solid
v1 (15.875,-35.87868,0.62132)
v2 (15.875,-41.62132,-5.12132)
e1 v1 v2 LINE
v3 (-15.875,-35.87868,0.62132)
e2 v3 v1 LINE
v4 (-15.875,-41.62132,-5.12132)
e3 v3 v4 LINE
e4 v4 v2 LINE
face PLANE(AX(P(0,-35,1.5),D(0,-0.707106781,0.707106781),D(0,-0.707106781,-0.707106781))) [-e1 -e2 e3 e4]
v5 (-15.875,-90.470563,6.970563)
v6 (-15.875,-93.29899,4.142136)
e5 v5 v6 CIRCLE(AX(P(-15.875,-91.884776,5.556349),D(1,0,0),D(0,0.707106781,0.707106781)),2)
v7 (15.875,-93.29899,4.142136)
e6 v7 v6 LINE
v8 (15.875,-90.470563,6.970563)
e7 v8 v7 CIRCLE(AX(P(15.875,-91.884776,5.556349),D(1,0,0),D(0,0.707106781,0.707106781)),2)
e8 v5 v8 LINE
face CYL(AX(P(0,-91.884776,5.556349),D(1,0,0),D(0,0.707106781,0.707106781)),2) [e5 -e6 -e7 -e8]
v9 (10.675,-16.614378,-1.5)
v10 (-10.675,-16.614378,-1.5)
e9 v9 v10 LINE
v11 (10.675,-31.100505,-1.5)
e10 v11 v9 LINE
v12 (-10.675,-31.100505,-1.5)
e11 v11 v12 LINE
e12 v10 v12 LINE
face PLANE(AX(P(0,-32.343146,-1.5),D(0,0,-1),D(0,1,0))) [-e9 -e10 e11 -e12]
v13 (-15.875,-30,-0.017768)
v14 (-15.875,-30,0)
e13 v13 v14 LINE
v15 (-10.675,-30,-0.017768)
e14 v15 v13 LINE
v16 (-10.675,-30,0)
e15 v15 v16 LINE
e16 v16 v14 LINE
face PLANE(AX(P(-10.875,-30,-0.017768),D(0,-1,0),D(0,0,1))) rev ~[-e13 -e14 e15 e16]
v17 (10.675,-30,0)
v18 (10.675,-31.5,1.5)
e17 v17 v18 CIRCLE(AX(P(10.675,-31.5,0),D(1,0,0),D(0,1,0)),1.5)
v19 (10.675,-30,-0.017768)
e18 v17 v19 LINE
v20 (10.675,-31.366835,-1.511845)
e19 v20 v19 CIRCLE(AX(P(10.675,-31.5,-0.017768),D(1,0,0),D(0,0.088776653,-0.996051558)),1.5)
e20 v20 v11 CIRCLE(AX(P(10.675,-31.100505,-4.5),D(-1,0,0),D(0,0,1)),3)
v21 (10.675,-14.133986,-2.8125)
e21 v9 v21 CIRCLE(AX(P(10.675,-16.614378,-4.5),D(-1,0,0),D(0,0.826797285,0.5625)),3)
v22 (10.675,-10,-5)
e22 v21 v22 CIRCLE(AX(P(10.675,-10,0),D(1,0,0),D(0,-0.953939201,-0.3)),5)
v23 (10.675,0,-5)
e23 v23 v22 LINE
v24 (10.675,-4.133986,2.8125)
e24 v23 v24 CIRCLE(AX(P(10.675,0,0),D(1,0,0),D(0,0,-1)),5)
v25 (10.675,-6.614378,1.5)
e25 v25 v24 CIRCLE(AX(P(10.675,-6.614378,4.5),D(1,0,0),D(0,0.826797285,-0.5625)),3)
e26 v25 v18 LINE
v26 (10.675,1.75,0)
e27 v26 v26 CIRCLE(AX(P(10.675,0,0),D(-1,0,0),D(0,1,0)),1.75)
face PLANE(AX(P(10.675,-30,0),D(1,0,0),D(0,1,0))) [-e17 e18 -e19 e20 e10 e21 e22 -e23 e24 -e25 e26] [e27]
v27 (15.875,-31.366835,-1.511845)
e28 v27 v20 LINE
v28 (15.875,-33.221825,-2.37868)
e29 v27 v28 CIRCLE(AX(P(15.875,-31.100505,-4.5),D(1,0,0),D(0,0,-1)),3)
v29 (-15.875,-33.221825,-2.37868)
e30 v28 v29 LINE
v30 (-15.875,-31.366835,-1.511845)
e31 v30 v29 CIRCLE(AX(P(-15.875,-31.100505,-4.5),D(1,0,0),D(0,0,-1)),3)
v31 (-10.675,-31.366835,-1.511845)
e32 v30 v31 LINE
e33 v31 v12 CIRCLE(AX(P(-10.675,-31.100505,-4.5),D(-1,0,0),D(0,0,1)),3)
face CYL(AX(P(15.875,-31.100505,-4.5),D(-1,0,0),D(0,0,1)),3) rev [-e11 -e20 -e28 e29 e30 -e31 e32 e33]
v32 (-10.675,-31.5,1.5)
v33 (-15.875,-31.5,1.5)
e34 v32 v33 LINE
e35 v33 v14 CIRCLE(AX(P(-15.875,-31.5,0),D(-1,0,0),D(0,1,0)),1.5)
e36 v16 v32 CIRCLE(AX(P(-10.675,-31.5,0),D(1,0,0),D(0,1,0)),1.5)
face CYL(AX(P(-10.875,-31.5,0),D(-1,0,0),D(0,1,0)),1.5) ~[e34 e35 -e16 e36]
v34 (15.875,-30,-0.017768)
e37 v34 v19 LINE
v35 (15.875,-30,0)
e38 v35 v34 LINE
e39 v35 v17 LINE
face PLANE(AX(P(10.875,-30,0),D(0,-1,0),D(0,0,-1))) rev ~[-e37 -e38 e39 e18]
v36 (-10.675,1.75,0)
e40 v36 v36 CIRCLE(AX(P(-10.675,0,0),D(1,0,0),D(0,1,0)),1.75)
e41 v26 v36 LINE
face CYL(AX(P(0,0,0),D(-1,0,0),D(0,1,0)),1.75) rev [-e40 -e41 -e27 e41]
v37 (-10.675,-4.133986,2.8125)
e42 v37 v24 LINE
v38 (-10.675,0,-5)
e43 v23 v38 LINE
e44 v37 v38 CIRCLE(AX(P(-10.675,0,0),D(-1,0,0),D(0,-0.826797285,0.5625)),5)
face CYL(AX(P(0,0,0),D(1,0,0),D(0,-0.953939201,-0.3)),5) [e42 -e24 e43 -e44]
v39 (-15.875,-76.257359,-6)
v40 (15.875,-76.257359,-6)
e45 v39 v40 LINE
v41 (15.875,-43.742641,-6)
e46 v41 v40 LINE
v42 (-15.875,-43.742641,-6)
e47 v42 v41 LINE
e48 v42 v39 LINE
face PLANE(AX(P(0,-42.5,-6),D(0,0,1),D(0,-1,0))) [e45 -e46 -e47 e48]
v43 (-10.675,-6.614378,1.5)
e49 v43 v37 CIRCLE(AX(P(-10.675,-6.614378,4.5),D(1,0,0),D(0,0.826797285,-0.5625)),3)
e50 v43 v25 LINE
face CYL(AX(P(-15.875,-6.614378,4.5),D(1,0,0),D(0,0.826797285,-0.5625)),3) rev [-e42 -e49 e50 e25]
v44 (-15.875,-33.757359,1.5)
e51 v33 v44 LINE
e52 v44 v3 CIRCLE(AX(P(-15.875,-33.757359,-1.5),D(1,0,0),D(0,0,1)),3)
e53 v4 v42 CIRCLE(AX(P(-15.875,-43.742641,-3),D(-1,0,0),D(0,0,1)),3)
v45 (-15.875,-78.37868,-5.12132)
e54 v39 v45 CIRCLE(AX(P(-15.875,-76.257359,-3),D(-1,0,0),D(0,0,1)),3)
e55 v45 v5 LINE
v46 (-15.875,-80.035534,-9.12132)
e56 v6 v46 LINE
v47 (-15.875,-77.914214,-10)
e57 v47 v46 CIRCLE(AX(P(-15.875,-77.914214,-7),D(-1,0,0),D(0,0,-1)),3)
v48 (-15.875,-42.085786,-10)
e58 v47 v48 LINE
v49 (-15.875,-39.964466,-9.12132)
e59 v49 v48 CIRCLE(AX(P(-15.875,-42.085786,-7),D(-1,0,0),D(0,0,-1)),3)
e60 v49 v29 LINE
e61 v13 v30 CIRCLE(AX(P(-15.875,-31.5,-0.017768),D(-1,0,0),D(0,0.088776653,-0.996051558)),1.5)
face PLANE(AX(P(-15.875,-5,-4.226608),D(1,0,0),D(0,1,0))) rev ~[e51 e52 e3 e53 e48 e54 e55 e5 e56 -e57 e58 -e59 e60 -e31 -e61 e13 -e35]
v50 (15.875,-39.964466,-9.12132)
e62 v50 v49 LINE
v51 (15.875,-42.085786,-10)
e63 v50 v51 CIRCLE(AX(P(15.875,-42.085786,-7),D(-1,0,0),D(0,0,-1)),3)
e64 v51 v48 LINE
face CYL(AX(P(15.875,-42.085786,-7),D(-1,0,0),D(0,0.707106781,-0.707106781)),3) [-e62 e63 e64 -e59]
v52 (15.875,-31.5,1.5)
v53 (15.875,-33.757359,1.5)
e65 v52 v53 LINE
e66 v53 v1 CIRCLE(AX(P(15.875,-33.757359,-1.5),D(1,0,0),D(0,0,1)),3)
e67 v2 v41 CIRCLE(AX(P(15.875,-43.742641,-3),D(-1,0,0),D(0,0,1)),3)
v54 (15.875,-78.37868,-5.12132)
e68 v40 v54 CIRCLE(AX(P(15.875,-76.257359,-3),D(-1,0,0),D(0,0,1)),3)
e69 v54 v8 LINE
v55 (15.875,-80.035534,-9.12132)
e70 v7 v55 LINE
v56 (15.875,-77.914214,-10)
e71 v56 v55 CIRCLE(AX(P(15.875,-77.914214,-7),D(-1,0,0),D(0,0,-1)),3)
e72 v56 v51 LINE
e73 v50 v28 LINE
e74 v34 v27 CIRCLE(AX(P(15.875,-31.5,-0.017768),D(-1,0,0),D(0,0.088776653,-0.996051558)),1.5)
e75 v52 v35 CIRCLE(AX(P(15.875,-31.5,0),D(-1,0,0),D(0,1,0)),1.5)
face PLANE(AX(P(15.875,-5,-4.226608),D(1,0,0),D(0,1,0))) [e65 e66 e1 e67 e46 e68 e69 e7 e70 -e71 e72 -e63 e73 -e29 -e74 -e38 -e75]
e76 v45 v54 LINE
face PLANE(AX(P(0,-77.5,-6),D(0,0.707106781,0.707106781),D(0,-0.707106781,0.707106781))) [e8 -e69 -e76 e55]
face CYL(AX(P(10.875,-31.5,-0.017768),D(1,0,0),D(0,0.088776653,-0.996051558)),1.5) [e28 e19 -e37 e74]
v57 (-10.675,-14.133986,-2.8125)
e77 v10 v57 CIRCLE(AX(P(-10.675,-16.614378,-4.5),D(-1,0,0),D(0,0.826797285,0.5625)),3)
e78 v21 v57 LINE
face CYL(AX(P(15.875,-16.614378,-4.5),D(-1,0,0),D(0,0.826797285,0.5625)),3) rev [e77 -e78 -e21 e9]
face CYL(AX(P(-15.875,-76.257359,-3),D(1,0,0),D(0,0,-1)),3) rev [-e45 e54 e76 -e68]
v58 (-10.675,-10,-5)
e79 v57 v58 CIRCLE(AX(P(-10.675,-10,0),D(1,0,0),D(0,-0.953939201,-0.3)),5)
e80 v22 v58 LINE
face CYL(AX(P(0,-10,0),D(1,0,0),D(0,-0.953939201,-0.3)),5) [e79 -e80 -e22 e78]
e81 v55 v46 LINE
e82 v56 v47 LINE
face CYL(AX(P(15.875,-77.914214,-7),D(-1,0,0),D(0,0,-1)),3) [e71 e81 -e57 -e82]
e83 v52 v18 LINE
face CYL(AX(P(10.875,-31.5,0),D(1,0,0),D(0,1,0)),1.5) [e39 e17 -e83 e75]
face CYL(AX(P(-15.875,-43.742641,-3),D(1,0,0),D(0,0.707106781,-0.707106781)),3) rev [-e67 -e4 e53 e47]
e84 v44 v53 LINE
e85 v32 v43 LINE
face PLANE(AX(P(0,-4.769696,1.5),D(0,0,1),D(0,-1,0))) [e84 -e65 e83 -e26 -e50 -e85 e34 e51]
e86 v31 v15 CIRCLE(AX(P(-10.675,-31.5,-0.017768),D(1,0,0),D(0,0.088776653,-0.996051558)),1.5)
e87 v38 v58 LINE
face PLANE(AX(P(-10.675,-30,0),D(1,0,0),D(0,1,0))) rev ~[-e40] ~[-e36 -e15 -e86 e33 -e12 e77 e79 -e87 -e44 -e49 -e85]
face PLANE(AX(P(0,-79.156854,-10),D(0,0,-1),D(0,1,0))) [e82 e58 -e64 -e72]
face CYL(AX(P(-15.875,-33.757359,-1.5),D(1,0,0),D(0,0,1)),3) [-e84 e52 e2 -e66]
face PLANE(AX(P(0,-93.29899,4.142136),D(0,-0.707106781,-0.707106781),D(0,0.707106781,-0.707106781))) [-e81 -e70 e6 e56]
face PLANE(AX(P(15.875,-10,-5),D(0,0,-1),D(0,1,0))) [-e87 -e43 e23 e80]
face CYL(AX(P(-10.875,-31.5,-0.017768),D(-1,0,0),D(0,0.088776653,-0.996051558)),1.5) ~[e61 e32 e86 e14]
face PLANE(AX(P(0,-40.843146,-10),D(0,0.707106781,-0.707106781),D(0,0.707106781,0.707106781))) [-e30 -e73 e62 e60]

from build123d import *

# Parameters (mm, degrees)
F0_R          = 1.75
F1_DEPTH      = 15.875
F3_DEPTH      = 31.75
F4_R          = 3
F5_W          = 5
F5_H          = 35
F6_DEPTH      = 10.001
F6_DEPTH_BACK = 7.5573491861
F7_T1_DEPTH   = 8.7055800262
F7_T3_DEPTH   = 8.75
F7_T5_DEPTH   = 8.75
F7_T7_DEPTH   = 8.7055800262
F8_DEPTH      = 0.2
F9_DEPTH      = 0.2


# Not quite as in the source:
# - a fillet or chamfer that OpenCascade refuses, or shapes differently, is made with other operations: its cross-section is extruded or revolved along the edge and cut away or added


with BuildPart() as f1:
    # F0 (on Right) → F1 (new body, symmetric)
    with BuildSketch(Plane.YZ):
        with BuildLine():
            Line((-5.2303039929, -1.5), (-4.7696960071, -1.5))
            ThreePointArc((-4.7696960071, -1.5), (5, 0), (-4.7696960071, 1.5))
            Line((-4.7696960071, 1.5), (-35, 1.5))
            Line((-35, 1.5), (-42.5, -6))
            Line((-42.5, -6), (-77.5, -6))
            Line((-77.5, -6), (-90.4705627485, 6.9705627485))
            ThreePointArc((-90.4705627485, 6.9705627485), (-93.2989898732, 6.9705627485), (-93.2989898732, 4.1421356237))
            Line((-93.2989898732, 4.1421356237), (-79.1568542495, -10))
            Line((-79.1568542495, -10), (-40.8431457505, -10))
            Line((-40.8431457505, -10), (-32.3431457505, -1.5))
            Line((-32.3431457505, -1.5), (-14.7696960071, -1.5))
            ThreePointArc((-14.7696960071, -1.5), (-10, -5), (-5.2303039929, -1.5))
        make_face()
        Circle(F0_R, mode=Mode.SUBTRACT)
    extrude(amount=F1_DEPTH, both=True)

    # F2 (on face) → F3 (join, through all)
    with BuildSketch(Plane.YZ.offset(15.875)):
        with BuildLine():
            ThreePointArc((-5.2303039929, -1.5), (-7.0419601085, -4.0311288741), (-10, -5))
            Line((-10, -5), (0, -5))
            ThreePointArc((0, -5), (-2.9580398915, -4.0311288741), (-4.7696960071, -1.5))
            Line((-4.7696960071, -1.5), (-5.2303039929, -1.5))
        make_face()
    extrude(amount=-F3_DEPTH)

    # F4
    f4_edges = [f1.edges().sort_by_distance(p)[0] for p in [
        (0, -4.769696, 1.5),
        (0, -14.769696, -1.5),
        (0, -77.5, -6),
        (0, -79.156854, -10),
        (0, -40.843146, -10),
        (0, -32.343146, -1.5),
        (0, -42.5, -6),
        (0, -35, 1.5),
    ]]
    fillet(f4_edges, radius=F4_R)

    # F5 (on Top) → F6 (cut, two sides)
    with BuildSketch(Plane.XY) as f6_sk:
        with Locations((-13.375, -12.5)):
            Rectangle(F5_W, F5_H)
        with Locations((13.375, -12.5)):
            Rectangle(F5_W, F5_H)
    extrude(amount=-F6_DEPTH, mode=Mode.SUBTRACT)
    extrude(f6_sk.sketch, amount=F6_DEPTH_BACK, mode=Mode.SUBTRACT)

    # F7: fillet of radius 1.5 on 4 edges, made by hand

    # F7_s2 → F7_t1 (cut)
    with BuildSketch(Plane.YZ.offset(10.875)):
        with BuildLine():
            ThreePointArc((-31.3668350211, -1.5118453264), (-30.3932598615, -1.0302531824), (-30, -0.0177679895))
            Line((-30, -0.0177679895), (-29.85, -0.0177679895))
            Line((-29.85, -0.0177679895), (-29.85, -1.5))
            Line((-29.85, -1.5), (-30, -1.65))
            ThreePointArc((-30, -1.65), (-31.1005050634, -1.65), (-31.3535185232, -1.66125306))
            Line((-31.3535185232, -1.66125306), (-31.3668350211, -1.5118453264))
        make_face()
    extrude(amount=F7_T1_DEPTH, mode=Mode.SUBTRACT)

    # F7_s4 → F7_t3 (cut)
    with BuildSketch(Plane.YZ.offset(10.875)):
        with BuildLine():
            ThreePointArc((-30, 0), (-30.4393398282, 1.0606601718), (-31.5, 1.5))
            Line((-31.5, 1.5), (-30, 1.5))
            Line((-30, 1.5), (-30, 0))
        make_face()
    extrude(amount=F7_T3_DEPTH, mode=Mode.SUBTRACT)

    # F7_s6 → F7_t5 (cut)
    with BuildSketch(Plane.YZ.offset(-19.625)):
        with BuildLine():
            ThreePointArc((-30, 0), (-30.4393398282, 1.0606601718), (-31.5, 1.5))
            Line((-31.5, 1.5), (-30, 1.5))
            Line((-30, 1.5), (-30, 0))
        make_face()
    extrude(amount=F7_T5_DEPTH, mode=Mode.SUBTRACT)

    # F7_s8 → F7_t7 (cut)
    with BuildSketch(Plane.YZ.offset(-19.5805800262)):
        with BuildLine():
            ThreePointArc((-31.3668350211, -1.5118453264), (-30.3932598615, -1.0302531824), (-30, -0.0177679895))
            Line((-30, -0.0177679895), (-29.85, -0.0177679895))
            Line((-29.85, -0.0177679895), (-29.85, -1.5))
            Line((-29.85, -1.5), (-30, -1.65))
            ThreePointArc((-30, -1.65), (-31.1005050634, -1.65), (-31.3535185232, -1.66125306))
            Line((-31.3535185232, -1.66125306), (-31.3668350211, -1.5118453264))
        make_face()
    extrude(amount=F7_T7_DEPTH, mode=Mode.SUBTRACT)

    # F8 (cut): a face of the model
    f8_faces = [f1.faces().sort_by_distance(p)[0] for p in [
        (10.875, -9.1101781633, -0.6280033564),
    ]]
    extrude(f8_faces, amount=-F8_DEPTH, mode=Mode.SUBTRACT)

    # F9 (cut): a face of the model
    f9_faces = [f1.faces().sort_by_distance(p)[0] for p in [
        (-10.875, -9.1101781633, -0.6280033564),
    ]]
    extrude(f9_faces, amount=-F9_DEPTH, mode=Mode.SUBTRACT)


solid = f1.part
